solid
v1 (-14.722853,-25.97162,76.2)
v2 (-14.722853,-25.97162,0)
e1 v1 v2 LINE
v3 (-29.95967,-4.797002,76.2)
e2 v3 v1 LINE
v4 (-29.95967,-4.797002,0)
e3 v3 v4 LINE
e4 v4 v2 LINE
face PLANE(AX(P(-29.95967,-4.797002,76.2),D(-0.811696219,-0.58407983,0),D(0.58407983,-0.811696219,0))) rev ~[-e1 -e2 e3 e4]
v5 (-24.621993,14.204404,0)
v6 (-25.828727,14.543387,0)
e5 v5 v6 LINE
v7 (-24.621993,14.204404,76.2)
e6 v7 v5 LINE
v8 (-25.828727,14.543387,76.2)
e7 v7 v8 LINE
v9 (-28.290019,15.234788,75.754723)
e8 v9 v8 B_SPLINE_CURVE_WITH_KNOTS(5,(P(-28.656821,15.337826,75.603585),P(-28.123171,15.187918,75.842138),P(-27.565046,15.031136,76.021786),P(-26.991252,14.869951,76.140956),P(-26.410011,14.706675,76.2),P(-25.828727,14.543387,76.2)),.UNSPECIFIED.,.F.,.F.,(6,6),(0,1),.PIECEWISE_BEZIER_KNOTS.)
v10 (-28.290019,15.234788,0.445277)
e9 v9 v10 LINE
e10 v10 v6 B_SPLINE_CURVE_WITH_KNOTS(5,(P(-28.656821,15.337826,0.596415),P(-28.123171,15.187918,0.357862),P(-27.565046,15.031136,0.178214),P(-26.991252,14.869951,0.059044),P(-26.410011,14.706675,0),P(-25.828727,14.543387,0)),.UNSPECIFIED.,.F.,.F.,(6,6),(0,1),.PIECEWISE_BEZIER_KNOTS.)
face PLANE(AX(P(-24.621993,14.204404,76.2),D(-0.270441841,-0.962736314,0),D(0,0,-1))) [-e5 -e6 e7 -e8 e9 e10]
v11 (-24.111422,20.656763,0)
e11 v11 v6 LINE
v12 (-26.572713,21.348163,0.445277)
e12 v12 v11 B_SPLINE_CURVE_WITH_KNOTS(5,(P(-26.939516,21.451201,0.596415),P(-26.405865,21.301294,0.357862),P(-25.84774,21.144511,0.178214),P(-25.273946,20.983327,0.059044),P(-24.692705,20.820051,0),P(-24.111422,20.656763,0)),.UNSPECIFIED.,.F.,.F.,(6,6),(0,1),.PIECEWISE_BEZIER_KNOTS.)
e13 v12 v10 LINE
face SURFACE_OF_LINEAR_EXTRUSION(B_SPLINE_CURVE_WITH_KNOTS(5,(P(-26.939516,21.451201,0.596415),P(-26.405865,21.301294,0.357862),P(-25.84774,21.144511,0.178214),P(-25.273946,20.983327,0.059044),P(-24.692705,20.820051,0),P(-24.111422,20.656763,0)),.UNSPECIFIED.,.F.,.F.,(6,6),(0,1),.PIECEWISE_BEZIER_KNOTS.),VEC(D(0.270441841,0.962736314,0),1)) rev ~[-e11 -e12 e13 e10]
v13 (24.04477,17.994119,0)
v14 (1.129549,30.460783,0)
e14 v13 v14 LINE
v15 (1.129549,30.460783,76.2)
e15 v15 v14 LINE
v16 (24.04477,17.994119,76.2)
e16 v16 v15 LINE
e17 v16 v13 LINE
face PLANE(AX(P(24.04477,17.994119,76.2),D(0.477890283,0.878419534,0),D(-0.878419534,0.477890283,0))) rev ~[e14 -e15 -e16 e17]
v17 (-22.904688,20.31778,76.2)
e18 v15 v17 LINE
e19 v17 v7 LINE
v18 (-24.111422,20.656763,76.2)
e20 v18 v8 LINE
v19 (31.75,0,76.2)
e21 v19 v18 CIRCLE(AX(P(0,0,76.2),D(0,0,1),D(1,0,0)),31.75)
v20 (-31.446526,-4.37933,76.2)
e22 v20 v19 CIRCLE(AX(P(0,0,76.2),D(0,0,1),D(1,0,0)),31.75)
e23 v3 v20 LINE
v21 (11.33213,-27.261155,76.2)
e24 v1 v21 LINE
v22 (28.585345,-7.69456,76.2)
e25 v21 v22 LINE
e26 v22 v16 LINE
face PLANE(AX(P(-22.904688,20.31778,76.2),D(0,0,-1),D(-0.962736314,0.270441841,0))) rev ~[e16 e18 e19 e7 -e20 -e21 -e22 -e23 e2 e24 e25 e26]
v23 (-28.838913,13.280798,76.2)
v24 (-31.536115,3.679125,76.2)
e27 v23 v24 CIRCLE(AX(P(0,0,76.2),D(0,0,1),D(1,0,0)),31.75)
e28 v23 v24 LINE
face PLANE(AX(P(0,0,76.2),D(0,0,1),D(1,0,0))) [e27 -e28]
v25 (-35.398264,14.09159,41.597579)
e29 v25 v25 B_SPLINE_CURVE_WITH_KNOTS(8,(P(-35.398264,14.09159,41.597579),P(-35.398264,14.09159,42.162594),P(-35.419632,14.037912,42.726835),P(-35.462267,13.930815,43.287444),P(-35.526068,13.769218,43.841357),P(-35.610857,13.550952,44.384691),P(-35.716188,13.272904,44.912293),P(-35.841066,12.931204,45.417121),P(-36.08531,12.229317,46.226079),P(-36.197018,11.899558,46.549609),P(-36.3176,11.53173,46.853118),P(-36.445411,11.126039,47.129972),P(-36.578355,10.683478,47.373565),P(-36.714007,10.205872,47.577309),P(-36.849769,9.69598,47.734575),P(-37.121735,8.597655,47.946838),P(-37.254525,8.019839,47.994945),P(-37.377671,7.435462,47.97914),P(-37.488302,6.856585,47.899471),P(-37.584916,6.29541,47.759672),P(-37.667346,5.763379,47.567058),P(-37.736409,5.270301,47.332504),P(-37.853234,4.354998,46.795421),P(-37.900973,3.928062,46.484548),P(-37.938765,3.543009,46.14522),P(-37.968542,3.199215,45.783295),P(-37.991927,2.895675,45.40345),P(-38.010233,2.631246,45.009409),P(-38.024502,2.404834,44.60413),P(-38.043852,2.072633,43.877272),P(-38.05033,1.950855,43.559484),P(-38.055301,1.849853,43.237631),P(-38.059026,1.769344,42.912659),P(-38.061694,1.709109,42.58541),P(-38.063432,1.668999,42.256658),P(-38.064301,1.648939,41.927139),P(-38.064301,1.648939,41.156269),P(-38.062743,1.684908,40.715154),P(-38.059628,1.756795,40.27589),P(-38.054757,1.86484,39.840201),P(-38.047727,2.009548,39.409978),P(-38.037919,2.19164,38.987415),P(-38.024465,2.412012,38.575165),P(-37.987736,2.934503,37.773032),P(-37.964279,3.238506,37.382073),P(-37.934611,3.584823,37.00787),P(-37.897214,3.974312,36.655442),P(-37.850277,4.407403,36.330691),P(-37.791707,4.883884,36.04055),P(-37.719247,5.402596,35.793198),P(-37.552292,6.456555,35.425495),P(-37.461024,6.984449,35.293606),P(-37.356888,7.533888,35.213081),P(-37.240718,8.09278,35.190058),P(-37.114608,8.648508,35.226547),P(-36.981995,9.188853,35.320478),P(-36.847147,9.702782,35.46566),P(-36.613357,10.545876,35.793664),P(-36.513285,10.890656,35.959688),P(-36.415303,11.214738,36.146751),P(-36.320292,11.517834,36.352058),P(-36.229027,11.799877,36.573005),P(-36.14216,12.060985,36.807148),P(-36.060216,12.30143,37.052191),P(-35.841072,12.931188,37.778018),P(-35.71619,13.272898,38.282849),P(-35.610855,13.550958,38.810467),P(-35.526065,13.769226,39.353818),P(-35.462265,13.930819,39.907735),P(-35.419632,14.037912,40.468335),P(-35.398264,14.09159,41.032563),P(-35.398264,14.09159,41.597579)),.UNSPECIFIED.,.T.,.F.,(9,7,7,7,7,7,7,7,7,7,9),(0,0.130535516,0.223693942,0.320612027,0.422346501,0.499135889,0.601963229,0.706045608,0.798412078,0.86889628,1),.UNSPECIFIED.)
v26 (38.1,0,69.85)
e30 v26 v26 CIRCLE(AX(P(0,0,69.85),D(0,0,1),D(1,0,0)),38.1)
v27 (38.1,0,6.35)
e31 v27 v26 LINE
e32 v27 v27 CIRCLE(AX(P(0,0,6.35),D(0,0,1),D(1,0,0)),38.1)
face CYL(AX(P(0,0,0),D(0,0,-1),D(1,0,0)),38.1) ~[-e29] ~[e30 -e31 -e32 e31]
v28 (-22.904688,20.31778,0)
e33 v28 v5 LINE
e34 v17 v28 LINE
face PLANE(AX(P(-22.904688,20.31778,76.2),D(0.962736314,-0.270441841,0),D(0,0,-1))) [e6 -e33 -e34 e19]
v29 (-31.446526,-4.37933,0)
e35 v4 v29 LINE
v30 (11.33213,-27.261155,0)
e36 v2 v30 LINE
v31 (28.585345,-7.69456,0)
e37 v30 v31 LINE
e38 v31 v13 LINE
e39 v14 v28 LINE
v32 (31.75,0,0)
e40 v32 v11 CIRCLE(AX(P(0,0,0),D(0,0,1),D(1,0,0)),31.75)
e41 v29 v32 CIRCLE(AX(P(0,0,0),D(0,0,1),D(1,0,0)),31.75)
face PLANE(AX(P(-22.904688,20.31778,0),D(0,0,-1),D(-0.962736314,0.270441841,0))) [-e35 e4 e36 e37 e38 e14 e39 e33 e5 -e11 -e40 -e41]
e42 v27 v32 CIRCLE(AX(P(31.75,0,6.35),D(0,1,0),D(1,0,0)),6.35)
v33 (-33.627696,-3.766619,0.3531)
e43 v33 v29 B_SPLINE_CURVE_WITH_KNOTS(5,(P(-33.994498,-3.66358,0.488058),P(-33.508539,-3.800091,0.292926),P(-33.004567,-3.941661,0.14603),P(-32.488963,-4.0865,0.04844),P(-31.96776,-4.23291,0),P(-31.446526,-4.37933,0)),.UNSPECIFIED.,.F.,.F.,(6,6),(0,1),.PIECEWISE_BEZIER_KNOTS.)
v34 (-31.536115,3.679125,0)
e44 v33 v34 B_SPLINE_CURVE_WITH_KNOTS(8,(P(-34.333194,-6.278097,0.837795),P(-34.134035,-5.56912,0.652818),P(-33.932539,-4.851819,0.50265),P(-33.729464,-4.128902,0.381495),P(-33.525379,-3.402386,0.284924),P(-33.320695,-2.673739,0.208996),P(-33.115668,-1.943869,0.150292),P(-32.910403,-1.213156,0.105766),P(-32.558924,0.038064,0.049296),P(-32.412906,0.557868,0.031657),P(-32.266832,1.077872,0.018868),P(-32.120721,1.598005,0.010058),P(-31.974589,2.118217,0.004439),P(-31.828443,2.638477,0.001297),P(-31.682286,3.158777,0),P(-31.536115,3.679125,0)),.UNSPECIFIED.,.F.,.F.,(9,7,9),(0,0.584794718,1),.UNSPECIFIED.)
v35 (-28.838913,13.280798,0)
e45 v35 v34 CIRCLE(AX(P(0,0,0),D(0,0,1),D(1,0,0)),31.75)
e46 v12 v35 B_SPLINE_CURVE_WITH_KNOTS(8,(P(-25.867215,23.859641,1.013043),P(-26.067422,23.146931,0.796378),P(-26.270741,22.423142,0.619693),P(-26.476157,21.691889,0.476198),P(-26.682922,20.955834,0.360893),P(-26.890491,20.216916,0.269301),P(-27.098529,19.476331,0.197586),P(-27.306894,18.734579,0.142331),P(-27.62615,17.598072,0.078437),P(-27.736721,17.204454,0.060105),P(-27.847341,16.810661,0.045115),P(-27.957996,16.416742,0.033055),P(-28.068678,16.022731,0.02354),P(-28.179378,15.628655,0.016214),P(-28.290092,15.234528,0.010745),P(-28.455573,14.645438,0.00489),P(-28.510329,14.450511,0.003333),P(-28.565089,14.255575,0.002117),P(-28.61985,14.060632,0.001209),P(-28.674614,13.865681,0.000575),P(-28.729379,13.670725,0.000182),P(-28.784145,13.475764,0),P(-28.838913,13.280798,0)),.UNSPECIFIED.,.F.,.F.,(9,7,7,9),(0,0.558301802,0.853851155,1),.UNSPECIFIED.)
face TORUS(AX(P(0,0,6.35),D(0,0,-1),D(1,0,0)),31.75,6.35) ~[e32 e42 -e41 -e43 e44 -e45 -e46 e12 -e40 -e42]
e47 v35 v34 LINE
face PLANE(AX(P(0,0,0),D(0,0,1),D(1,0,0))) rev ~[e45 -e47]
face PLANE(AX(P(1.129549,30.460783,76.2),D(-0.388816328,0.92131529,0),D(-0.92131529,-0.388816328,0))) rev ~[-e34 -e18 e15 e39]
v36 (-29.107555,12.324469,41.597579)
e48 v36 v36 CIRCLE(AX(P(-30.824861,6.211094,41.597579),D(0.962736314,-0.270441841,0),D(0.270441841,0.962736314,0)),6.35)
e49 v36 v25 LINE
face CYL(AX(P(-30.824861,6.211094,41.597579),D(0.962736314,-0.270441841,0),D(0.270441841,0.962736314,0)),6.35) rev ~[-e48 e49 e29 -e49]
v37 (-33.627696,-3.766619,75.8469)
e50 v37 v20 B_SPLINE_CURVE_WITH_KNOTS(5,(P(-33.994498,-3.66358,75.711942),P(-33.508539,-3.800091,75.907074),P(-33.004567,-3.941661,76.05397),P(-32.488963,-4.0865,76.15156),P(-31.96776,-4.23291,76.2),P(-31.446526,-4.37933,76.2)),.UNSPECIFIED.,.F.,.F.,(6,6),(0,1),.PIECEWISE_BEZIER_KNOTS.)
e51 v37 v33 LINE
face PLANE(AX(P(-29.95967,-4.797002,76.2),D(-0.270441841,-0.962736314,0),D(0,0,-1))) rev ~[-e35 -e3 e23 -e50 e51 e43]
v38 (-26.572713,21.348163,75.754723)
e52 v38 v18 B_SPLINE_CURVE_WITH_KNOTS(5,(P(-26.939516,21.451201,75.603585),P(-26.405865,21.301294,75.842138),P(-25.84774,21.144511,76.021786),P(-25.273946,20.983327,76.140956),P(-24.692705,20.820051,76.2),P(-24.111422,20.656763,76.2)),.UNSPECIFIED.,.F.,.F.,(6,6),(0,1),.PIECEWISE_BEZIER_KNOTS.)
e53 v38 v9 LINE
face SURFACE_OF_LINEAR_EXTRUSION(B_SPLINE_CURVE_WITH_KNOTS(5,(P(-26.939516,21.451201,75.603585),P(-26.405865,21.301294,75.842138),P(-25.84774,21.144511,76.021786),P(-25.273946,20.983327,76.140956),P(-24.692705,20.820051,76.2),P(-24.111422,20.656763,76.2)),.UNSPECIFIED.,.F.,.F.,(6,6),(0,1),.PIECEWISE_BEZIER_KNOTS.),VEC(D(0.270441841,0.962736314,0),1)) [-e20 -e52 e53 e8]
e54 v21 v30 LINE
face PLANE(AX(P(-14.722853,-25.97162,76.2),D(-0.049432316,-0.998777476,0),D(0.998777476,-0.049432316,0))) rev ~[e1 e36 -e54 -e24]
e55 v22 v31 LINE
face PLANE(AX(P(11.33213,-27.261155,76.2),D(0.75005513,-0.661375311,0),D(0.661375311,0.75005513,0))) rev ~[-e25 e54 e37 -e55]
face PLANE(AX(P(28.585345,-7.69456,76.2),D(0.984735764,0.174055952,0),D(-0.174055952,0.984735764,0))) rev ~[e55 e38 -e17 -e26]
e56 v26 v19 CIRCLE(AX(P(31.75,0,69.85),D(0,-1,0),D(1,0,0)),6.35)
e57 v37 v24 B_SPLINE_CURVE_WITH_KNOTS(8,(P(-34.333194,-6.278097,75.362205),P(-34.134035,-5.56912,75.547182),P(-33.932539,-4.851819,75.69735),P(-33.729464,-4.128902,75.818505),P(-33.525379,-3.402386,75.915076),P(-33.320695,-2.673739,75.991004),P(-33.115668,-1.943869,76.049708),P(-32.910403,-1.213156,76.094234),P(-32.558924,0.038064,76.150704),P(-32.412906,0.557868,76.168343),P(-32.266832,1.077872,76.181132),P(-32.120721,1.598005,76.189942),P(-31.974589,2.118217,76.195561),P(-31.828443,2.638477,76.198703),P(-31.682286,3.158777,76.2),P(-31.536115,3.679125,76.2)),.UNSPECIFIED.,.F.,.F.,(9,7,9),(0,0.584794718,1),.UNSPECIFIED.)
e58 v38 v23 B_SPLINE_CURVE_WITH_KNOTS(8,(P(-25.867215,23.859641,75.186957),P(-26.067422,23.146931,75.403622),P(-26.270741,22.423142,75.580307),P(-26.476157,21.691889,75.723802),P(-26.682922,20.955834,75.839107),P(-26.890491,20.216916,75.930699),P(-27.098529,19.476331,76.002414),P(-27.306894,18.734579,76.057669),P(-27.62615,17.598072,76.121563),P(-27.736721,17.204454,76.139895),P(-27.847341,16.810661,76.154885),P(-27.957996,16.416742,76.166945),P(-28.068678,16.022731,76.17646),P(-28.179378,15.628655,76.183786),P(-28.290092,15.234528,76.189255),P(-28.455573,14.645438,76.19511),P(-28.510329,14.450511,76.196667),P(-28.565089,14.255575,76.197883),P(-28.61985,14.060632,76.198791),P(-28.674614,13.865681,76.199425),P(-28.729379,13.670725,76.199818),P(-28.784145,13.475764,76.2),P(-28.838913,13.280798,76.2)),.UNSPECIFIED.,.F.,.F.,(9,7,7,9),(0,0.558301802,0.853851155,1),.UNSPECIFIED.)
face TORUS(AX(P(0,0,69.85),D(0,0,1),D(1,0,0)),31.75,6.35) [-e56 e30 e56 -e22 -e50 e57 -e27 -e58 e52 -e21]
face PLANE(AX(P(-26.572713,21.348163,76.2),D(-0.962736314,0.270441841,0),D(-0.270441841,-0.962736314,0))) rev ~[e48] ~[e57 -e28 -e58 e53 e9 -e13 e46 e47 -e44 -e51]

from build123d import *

# Parameters (mm, degrees)
F0_R     = 38.1
F1_DEPTH = 76.2
F3_DEPTH = 76.2
F4_R     = 6.35
F5_DEPTH = 3.81
F6_DEPTH = 6.35
F7_R     = 6.35
F8_DEPTH = 12.7


# Not quite as in the source:
# - the program builds the solid bodies; features that only make, move or delete a surface that nothing else refers to are left out


with BuildPart() as f1:
    # F0 (on Top) → F1 (new body)
    with BuildSketch(Plane.XY):
        Circle(F0_R)
    extrude(amount=F1_DEPTH)

    # F2 (on face) → F3 (cut)
    with BuildSketch(Plane.XY.offset(76.2)):
        Polygon((-22.9046876713, 20.3177796807), (-29.9596701578, -4.7970021274), (-14.7228526975, -25.9716198769), (11.3321303875, -27.2611545189), (28.5853454095, -7.6945601662), (24.0447695554, 17.9941185477), (1.1295490542, 30.4607825978), align=None)
    extrude(amount=-F3_DEPTH, mode=Mode.SUBTRACT)

    # F4
    f4_edges = [f1.edges().sort_by_distance(p)[0] for p in [
        (38.1, 0, 38.1),
        (-38.1, 0, 0),
        (-38.1, 0, 76.2),
    ]]
    fillet(f4_edges, radius=F4_R)

    # F5 (cut): a face of the model
    f5_faces = [f1.faces().sort_by_distance(p)[0] for p in [
        (-26.4321789145, 7.7603887767, 38.1),
    ]]
    extrude(f5_faces, amount=-F5_DEPTH, mode=Mode.SUBTRACT)

    # F6 (add): a face of the model
    f6_faces = [f1.faces().sort_by_distance(p)[0] for p in [
        (-24.7355489473, 20.8320861293, 38.1),
    ]]
    extrude(f6_faces, amount=F6_DEPTH)

    # F7 (on face) → F8 (cut)
    with BuildSketch(Plane(origin=(-30.1875139729, 8.4799614831, 0), x_dir=(0.2704418413, 0.9627363141, 0), z_dir=(0.9627363141, -0.2704418413, 0))):
        with Locations((-2.3566866294, 41.5975786746)):
            Circle(F7_R)
    extrude(amount=-F8_DEPTH, mode=Mode.SUBTRACT)


solid = f1.part
